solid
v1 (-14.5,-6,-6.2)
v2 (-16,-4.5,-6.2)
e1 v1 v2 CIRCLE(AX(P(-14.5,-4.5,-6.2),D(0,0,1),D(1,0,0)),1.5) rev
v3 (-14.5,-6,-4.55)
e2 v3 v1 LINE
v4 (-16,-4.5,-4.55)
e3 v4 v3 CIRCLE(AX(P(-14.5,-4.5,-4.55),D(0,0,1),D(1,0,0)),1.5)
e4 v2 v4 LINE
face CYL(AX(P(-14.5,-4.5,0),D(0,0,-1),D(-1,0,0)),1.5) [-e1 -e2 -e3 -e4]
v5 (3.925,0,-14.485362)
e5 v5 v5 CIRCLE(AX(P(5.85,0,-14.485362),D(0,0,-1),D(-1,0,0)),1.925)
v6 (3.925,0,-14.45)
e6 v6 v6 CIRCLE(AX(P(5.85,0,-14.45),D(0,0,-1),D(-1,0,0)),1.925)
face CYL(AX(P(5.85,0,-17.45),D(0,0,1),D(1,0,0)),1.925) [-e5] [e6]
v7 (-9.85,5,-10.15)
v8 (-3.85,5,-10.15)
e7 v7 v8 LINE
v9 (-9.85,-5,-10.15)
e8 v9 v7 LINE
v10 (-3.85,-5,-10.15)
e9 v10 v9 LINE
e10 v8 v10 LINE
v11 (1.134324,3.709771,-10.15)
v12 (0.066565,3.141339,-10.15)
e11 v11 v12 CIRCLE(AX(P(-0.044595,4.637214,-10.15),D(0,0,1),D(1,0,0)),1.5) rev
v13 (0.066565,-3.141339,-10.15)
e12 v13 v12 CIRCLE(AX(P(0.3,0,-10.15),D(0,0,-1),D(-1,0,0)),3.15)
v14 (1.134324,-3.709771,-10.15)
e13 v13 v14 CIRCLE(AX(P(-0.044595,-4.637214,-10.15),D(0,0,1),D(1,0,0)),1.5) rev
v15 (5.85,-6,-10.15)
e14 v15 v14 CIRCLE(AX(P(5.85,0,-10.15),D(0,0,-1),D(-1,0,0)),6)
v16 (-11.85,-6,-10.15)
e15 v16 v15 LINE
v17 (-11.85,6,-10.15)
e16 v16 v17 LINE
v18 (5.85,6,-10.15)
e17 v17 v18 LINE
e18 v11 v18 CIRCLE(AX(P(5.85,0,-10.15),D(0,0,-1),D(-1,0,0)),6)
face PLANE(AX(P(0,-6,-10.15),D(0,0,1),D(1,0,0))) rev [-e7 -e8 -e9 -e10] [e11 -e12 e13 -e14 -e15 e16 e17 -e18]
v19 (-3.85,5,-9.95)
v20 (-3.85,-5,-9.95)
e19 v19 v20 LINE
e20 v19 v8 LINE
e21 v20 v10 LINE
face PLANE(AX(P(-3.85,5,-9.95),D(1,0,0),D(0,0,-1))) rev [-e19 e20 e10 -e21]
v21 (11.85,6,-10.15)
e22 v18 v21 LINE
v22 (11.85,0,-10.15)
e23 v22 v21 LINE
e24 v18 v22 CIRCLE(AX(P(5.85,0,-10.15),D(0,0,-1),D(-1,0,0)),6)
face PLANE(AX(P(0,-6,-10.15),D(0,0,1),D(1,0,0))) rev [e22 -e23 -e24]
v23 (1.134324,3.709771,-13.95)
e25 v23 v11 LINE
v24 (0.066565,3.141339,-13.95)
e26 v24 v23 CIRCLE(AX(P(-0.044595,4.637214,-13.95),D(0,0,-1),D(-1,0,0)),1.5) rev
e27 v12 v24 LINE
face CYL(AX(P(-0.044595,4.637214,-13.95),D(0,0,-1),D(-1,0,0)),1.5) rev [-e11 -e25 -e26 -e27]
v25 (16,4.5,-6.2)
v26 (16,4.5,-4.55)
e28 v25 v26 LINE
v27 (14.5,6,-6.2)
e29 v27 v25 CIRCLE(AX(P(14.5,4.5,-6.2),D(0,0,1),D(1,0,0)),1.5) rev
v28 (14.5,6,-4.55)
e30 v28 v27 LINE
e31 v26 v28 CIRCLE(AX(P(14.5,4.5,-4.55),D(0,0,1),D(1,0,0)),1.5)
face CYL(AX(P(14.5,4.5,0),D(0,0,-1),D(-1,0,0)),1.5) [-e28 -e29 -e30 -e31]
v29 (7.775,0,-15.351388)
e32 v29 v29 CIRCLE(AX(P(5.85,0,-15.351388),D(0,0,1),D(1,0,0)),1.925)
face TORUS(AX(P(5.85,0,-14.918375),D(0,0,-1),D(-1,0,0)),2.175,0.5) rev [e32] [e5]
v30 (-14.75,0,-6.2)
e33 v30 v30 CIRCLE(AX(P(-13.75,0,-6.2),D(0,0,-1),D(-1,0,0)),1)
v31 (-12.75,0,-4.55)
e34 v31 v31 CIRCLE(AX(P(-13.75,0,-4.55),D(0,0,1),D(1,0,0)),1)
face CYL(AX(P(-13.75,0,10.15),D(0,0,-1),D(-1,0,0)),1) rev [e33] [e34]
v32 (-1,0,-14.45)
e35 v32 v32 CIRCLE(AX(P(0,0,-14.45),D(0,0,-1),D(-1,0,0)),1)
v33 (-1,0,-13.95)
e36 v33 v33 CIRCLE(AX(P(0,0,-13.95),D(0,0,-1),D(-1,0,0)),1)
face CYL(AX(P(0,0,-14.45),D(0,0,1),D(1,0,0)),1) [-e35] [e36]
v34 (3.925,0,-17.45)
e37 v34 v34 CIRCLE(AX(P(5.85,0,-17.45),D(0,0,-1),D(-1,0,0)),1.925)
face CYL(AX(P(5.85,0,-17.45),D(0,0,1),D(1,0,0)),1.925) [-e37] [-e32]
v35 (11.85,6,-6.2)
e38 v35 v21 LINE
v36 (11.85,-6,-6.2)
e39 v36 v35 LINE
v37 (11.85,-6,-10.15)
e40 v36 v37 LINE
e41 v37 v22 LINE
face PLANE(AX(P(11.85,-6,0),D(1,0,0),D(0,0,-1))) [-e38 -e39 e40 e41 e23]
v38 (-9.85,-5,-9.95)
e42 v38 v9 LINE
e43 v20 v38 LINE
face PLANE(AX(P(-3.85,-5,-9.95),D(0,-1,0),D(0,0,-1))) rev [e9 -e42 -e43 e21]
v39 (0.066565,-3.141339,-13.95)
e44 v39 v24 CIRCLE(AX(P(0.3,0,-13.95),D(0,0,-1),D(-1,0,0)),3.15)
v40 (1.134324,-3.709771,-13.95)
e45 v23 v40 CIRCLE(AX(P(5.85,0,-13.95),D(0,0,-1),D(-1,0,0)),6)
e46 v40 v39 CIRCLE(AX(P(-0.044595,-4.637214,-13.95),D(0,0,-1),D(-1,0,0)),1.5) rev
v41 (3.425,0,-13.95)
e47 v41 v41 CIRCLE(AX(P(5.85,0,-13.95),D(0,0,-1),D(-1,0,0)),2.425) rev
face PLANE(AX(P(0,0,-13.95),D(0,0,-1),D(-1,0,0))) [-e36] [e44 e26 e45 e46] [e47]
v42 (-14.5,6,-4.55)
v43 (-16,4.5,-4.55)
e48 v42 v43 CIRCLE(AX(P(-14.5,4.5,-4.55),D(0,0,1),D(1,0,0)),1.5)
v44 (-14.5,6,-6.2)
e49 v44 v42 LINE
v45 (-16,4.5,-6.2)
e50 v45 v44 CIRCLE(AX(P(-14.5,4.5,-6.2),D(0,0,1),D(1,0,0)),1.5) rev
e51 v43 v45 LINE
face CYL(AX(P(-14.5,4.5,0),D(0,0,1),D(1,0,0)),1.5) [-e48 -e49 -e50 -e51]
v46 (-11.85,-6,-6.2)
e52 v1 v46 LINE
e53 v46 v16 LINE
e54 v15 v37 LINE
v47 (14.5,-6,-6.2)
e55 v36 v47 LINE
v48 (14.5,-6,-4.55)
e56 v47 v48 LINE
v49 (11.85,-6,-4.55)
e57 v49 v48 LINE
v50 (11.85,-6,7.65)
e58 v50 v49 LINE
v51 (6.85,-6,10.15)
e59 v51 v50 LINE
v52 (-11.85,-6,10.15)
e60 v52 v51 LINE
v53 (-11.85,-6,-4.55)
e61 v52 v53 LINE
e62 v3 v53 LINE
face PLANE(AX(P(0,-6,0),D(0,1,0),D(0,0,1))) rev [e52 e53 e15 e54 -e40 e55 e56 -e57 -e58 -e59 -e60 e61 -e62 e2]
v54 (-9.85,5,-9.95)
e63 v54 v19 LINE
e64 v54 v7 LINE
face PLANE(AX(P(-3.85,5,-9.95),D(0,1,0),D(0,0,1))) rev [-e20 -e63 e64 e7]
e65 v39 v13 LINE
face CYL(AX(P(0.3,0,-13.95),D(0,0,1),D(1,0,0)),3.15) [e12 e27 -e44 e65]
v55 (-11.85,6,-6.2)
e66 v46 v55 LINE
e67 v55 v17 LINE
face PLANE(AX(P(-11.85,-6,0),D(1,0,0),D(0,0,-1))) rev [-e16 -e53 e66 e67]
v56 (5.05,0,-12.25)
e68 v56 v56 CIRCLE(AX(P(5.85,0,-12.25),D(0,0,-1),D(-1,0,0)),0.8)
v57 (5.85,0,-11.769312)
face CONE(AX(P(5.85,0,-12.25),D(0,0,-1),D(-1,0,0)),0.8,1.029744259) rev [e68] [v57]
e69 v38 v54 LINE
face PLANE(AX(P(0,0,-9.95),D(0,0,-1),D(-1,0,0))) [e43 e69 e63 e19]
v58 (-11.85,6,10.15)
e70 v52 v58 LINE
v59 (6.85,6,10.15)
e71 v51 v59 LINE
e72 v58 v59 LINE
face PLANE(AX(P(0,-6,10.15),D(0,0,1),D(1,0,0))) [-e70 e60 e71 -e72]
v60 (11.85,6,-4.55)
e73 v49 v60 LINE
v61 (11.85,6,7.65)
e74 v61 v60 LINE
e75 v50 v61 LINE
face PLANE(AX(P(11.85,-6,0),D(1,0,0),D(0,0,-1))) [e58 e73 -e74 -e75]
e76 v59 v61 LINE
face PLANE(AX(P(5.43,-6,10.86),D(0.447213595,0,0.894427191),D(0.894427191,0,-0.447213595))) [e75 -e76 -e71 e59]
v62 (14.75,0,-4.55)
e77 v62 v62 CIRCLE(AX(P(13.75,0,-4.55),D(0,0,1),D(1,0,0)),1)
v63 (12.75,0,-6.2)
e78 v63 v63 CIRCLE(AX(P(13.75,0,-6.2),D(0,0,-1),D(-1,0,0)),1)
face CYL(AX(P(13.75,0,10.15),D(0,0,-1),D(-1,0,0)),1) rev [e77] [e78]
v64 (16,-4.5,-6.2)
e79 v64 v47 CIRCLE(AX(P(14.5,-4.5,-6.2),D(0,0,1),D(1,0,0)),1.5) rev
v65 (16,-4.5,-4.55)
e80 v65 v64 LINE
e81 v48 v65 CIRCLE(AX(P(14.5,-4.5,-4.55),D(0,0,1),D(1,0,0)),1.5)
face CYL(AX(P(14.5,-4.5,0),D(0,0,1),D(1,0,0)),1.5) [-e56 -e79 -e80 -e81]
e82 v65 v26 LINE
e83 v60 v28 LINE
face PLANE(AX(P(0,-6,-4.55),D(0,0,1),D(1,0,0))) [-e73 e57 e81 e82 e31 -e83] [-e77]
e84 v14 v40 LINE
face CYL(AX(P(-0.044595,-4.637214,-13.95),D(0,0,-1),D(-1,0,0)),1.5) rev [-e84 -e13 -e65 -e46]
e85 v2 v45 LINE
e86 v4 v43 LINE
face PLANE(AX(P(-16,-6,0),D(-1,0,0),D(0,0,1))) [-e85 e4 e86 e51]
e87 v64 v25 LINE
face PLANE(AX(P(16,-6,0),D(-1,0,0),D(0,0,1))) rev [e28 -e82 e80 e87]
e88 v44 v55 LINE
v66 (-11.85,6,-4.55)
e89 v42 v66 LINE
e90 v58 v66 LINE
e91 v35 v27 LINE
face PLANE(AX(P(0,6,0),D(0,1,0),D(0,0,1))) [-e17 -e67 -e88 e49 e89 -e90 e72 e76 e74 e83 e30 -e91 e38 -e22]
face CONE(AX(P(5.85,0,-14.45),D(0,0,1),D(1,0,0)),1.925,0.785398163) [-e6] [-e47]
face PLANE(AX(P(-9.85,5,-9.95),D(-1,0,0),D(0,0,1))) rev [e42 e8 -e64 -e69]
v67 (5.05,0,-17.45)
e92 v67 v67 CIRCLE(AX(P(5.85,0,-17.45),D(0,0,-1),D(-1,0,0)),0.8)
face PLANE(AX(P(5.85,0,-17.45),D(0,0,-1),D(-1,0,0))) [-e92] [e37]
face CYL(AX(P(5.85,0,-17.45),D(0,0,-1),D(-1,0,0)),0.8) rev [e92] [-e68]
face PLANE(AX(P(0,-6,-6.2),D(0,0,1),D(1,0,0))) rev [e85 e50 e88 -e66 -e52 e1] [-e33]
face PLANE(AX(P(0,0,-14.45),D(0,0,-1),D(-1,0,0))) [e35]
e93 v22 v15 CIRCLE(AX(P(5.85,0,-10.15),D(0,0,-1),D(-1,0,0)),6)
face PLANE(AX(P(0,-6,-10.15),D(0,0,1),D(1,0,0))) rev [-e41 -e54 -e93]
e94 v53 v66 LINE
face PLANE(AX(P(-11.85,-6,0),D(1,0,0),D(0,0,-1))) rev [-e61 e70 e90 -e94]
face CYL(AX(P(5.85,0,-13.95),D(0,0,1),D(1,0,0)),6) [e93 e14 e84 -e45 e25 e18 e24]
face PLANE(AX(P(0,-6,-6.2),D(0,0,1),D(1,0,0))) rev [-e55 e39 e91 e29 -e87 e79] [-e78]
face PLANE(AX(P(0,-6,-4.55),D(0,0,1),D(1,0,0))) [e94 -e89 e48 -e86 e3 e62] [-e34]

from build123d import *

# Parameters (mm, degrees)
BOSS_EXTRUDE1_DEPTH       = 6
BOSS_EXTRUDE1_DEPTH_BACK  = 6
SKETCH1_W                 = 23.7
SKETCH1_H                 = 3.95
SKETCH1_H_2               = 1.65
SKETCH1_W_2               = 4.15
FILLET1_R                 = 1.5
SKETCH2_R                 = 1
CUT_EXTRUDE1_DEPTH        = 24.65
BOSS_EXTRUDE2_DEPTH       = 3.8
FILLET2_R                 = 1.5
SKETCH4_W                 = 6
SKETCH4_H                 = 10
CUT_EXTRUDE2_DEPTH        = 0.2
SKETCH5_R                 = 1
BOSS_EXTRUDE3_DEPTH       = 0.5
SKETCH6_R                 = 1.925
BOSS_EXTRUDE4_DEPTH       = 0.5
CHAMFER1_SIZE             = 0.5
SKETCH7_R                 = 1.925
BOSS_EXTRUDE5_DEPTH       = 3
SKETCH8_R                 = 0.5
M2X0_4_TAPPED_HOLE1_D     = 1.6
M2X0_4_TAPPED_HOLE1_DEPTH = 5.2
M2X0_4_TAPPED_HOLE1_TIP   = 0.480688495


with BuildPart() as part:
    # Sketch1 → Boss-Extrude1 (new, two sides: drawn at the far end of the back side and taken through both)
    with BuildSketch(Plane(origin=(0, 0, 0), x_dir=(1, 0, 0), z_dir=(0, 1, 0)).offset(-BOSS_EXTRUDE1_DEPTH_BACK)):
        with Locations((0, 8.175)):
            Rectangle(SKETCH1_W, SKETCH1_H)
        with Locations((0, 5.375)):
            Rectangle(SKETCH1_W, SKETCH1_H_2)
        with Locations((-13.925, 5.375)):
            Rectangle(SKETCH1_W_2, SKETCH1_H_2)
        with Locations((13.925, 5.375)):
            Rectangle(SKETCH1_W_2, SKETCH1_H_2)
        Polygon((-11.85, -10.15), (6.85, -10.15), (11.85, -7.65), (11.85, 4.55), (-11.85, 4.55), align=None)
    extrude(amount=BOSS_EXTRUDE1_DEPTH + BOSS_EXTRUDE1_DEPTH_BACK)

    # Fillet1
    fillet1_edges = [part.edges().sort_by_distance(p)[0] for p in [
        (-16, -6, -5.375),
        (16, 6, -5.375),
        (-16, 6, -5.375),
        (16, -6, -5.375),
    ]]
    fillet(fillet1_edges, radius=FILLET1_R)

    # Sketch2 → Cut-Extrude1 (cut, through all)
    with BuildSketch(Plane(origin=(0, 0, -6.2), x_dir=(-1, 0, 0), z_dir=(0, 0, -1))):
        with Locations((-13.75, 0)):
            Circle(SKETCH2_R)
        with Locations((13.75, 0)):
            Circle(SKETCH2_R)
    extrude(amount=-CUT_EXTRUDE1_DEPTH, mode=Mode.SUBTRACT)

    # Sketch3 → Boss-Extrude2 (add)
    with BuildSketch(Plane(origin=(0, 0, -10.15), x_dir=(-1, 0, 0), z_dir=(0, 0, -1))):
        with BuildLine():
            ThreePointArc((-0.725675676, 3.121105608), (-0.073065435, 1.620810608), (0.15, 0))
            Line((0.15, 0), (2.85, 0))
            ThreePointArc((2.85, 0), (1.77142724, 2.373118031), (-0.725675676, 3.121105608))
        make_face()
        with BuildLine():
            ThreePointArc((-0.725675676, -3.121105608), (-0.073065435, -1.620810608), (0.15, 0))
            Line((0.15, 0), (-3.45, 0))
            ThreePointArc((-3.45, 0), (-2.673118031, -2.07142724), (-0.725675676, -3.121105608))
        make_face()
        with BuildLine():
            Line((-3.45, 0), (0.15, 0))
            ThreePointArc((0.15, 0), (-0.073065435, 1.620810608), (-0.725675676, 3.121105608))
            ThreePointArc((-0.725675676, 3.121105608), (-2.673118031, 2.07142724), (-3.45, 0))
        make_face()
        with BuildLine():
            Line((2.85, 0), (0.15, 0))
            ThreePointArc((0.15, 0), (-0.073065435, -1.620810608), (-0.725675676, -3.121105608))
            ThreePointArc((-0.725675676, -3.121105608), (1.77142724, -2.373118031), (2.85, 0))
        make_face()
        with BuildLine():
            ThreePointArc((-0.725675676, -3.121105608), (-2.673118031, -2.07142724), (-3.45, 0))
            Line((-3.45, 0), (-11.85, 0))
            ThreePointArc((-11.85, 0), (-7.470810608, -5.776934565), (-0.725675676, -3.121105608))
        make_face()
        with BuildLine():
            Line((-11.85, 0), (-3.45, 0))
            ThreePointArc((-3.45, 0), (-2.673118031, 2.07142724), (-0.725675676, 3.121105608))
            ThreePointArc((-0.725675676, 3.121105608), (-7.470810608, 5.776934565), (-11.85, 0))
        make_face()
    extrude(amount=BOSS_EXTRUDE2_DEPTH)

    # Fillet2
    fillet2_edges = [part.edges().sort_by_distance(p)[0] for p in [
        (0.725675676, 3.121105608, -12.05),
        (0.725675676, -3.121105608, -12.05),
    ]]
    fillet(fillet2_edges, radius=FILLET2_R)

    # Sketch4 → Cut-Extrude2 (cut)
    with BuildSketch(Plane(origin=(0, 0, -10.15), x_dir=(-1, 0, 0), z_dir=(0, 0, -1))):
        with Locations((6.85, 0)):
            Rectangle(SKETCH4_W, SKETCH4_H)
    extrude(amount=-CUT_EXTRUDE2_DEPTH, mode=Mode.SUBTRACT)

    # Sketch5 → Boss-Extrude3 (add)
    with BuildSketch(Plane(origin=(0, 0, -13.95), x_dir=(-1, 0, 0), z_dir=(0, 0, -1))):
        Circle(SKETCH5_R)
    extrude(amount=BOSS_EXTRUDE3_DEPTH)

    # Sketch6 → Boss-Extrude4 (add)
    with BuildSketch(Plane(origin=(0, 0, -13.95), x_dir=(-1, 0, 0), z_dir=(0, 0, -1))):
        with Locations((-5.85, 0)):
            Circle(SKETCH6_R)
    extrude(amount=BOSS_EXTRUDE4_DEPTH)

    # Chamfer1
    chamfer1_edges = [part.edges().sort_by_distance(p)[0] for p in [
        (7.775, 0, -13.95),
    ]]
    chamfer(chamfer1_edges, length=CHAMFER1_SIZE - 0.0001)  # a hair under: the kernel refuses the full size

    # Sketch7 → Boss-Extrude5 (add)
    with BuildSketch(Plane(origin=(0, 0, -14.45), x_dir=(-1, 0, 0), z_dir=(0, 0, -1))):
        with Locations((-5.85, 0)):
            Circle(SKETCH7_R)
    extrude(amount=BOSS_EXTRUDE5_DEPTH)

    # Sketch8 → Cut-Revolve1 (revolve, cut)
    with BuildSketch(Plane(origin=(0, 0, 0), x_dir=(1, 0, 0), z_dir=(0, 1, 0)), mode=Mode.PRIVATE) as cut_revolve1_sk:
        with Locations((8.025, 14.91837485)):
            Circle(SKETCH8_R)
    revolve(cut_revolve1_sk.sketch.rotate(Axis((5.85, 0, -17.45), (0, 0, 1)), 180), axis=Axis((5.85, 0, -17.45), (0, 0, 1)), mode=Mode.SUBTRACT)

    # M2x0.4 Tapped Hole1
    with Locations(Plane(origin=(0, 0, -17.45), x_dir=(-1, 0, 0), z_dir=(0, 0, -1))):
        with Locations((-5.85, 0)):
            Hole(M2X0_4_TAPPED_HOLE1_D / 2, depth=M2X0_4_TAPPED_HOLE1_DEPTH)
            with Locations((0, 0, -(M2X0_4_TAPPED_HOLE1_DEPTH + M2X0_4_TAPPED_HOLE1_TIP / 2))):  # 118° drill point
                Cone(0, M2X0_4_TAPPED_HOLE1_D / 2, M2X0_4_TAPPED_HOLE1_TIP, mode=Mode.SUBTRACT)


solid = part.part
